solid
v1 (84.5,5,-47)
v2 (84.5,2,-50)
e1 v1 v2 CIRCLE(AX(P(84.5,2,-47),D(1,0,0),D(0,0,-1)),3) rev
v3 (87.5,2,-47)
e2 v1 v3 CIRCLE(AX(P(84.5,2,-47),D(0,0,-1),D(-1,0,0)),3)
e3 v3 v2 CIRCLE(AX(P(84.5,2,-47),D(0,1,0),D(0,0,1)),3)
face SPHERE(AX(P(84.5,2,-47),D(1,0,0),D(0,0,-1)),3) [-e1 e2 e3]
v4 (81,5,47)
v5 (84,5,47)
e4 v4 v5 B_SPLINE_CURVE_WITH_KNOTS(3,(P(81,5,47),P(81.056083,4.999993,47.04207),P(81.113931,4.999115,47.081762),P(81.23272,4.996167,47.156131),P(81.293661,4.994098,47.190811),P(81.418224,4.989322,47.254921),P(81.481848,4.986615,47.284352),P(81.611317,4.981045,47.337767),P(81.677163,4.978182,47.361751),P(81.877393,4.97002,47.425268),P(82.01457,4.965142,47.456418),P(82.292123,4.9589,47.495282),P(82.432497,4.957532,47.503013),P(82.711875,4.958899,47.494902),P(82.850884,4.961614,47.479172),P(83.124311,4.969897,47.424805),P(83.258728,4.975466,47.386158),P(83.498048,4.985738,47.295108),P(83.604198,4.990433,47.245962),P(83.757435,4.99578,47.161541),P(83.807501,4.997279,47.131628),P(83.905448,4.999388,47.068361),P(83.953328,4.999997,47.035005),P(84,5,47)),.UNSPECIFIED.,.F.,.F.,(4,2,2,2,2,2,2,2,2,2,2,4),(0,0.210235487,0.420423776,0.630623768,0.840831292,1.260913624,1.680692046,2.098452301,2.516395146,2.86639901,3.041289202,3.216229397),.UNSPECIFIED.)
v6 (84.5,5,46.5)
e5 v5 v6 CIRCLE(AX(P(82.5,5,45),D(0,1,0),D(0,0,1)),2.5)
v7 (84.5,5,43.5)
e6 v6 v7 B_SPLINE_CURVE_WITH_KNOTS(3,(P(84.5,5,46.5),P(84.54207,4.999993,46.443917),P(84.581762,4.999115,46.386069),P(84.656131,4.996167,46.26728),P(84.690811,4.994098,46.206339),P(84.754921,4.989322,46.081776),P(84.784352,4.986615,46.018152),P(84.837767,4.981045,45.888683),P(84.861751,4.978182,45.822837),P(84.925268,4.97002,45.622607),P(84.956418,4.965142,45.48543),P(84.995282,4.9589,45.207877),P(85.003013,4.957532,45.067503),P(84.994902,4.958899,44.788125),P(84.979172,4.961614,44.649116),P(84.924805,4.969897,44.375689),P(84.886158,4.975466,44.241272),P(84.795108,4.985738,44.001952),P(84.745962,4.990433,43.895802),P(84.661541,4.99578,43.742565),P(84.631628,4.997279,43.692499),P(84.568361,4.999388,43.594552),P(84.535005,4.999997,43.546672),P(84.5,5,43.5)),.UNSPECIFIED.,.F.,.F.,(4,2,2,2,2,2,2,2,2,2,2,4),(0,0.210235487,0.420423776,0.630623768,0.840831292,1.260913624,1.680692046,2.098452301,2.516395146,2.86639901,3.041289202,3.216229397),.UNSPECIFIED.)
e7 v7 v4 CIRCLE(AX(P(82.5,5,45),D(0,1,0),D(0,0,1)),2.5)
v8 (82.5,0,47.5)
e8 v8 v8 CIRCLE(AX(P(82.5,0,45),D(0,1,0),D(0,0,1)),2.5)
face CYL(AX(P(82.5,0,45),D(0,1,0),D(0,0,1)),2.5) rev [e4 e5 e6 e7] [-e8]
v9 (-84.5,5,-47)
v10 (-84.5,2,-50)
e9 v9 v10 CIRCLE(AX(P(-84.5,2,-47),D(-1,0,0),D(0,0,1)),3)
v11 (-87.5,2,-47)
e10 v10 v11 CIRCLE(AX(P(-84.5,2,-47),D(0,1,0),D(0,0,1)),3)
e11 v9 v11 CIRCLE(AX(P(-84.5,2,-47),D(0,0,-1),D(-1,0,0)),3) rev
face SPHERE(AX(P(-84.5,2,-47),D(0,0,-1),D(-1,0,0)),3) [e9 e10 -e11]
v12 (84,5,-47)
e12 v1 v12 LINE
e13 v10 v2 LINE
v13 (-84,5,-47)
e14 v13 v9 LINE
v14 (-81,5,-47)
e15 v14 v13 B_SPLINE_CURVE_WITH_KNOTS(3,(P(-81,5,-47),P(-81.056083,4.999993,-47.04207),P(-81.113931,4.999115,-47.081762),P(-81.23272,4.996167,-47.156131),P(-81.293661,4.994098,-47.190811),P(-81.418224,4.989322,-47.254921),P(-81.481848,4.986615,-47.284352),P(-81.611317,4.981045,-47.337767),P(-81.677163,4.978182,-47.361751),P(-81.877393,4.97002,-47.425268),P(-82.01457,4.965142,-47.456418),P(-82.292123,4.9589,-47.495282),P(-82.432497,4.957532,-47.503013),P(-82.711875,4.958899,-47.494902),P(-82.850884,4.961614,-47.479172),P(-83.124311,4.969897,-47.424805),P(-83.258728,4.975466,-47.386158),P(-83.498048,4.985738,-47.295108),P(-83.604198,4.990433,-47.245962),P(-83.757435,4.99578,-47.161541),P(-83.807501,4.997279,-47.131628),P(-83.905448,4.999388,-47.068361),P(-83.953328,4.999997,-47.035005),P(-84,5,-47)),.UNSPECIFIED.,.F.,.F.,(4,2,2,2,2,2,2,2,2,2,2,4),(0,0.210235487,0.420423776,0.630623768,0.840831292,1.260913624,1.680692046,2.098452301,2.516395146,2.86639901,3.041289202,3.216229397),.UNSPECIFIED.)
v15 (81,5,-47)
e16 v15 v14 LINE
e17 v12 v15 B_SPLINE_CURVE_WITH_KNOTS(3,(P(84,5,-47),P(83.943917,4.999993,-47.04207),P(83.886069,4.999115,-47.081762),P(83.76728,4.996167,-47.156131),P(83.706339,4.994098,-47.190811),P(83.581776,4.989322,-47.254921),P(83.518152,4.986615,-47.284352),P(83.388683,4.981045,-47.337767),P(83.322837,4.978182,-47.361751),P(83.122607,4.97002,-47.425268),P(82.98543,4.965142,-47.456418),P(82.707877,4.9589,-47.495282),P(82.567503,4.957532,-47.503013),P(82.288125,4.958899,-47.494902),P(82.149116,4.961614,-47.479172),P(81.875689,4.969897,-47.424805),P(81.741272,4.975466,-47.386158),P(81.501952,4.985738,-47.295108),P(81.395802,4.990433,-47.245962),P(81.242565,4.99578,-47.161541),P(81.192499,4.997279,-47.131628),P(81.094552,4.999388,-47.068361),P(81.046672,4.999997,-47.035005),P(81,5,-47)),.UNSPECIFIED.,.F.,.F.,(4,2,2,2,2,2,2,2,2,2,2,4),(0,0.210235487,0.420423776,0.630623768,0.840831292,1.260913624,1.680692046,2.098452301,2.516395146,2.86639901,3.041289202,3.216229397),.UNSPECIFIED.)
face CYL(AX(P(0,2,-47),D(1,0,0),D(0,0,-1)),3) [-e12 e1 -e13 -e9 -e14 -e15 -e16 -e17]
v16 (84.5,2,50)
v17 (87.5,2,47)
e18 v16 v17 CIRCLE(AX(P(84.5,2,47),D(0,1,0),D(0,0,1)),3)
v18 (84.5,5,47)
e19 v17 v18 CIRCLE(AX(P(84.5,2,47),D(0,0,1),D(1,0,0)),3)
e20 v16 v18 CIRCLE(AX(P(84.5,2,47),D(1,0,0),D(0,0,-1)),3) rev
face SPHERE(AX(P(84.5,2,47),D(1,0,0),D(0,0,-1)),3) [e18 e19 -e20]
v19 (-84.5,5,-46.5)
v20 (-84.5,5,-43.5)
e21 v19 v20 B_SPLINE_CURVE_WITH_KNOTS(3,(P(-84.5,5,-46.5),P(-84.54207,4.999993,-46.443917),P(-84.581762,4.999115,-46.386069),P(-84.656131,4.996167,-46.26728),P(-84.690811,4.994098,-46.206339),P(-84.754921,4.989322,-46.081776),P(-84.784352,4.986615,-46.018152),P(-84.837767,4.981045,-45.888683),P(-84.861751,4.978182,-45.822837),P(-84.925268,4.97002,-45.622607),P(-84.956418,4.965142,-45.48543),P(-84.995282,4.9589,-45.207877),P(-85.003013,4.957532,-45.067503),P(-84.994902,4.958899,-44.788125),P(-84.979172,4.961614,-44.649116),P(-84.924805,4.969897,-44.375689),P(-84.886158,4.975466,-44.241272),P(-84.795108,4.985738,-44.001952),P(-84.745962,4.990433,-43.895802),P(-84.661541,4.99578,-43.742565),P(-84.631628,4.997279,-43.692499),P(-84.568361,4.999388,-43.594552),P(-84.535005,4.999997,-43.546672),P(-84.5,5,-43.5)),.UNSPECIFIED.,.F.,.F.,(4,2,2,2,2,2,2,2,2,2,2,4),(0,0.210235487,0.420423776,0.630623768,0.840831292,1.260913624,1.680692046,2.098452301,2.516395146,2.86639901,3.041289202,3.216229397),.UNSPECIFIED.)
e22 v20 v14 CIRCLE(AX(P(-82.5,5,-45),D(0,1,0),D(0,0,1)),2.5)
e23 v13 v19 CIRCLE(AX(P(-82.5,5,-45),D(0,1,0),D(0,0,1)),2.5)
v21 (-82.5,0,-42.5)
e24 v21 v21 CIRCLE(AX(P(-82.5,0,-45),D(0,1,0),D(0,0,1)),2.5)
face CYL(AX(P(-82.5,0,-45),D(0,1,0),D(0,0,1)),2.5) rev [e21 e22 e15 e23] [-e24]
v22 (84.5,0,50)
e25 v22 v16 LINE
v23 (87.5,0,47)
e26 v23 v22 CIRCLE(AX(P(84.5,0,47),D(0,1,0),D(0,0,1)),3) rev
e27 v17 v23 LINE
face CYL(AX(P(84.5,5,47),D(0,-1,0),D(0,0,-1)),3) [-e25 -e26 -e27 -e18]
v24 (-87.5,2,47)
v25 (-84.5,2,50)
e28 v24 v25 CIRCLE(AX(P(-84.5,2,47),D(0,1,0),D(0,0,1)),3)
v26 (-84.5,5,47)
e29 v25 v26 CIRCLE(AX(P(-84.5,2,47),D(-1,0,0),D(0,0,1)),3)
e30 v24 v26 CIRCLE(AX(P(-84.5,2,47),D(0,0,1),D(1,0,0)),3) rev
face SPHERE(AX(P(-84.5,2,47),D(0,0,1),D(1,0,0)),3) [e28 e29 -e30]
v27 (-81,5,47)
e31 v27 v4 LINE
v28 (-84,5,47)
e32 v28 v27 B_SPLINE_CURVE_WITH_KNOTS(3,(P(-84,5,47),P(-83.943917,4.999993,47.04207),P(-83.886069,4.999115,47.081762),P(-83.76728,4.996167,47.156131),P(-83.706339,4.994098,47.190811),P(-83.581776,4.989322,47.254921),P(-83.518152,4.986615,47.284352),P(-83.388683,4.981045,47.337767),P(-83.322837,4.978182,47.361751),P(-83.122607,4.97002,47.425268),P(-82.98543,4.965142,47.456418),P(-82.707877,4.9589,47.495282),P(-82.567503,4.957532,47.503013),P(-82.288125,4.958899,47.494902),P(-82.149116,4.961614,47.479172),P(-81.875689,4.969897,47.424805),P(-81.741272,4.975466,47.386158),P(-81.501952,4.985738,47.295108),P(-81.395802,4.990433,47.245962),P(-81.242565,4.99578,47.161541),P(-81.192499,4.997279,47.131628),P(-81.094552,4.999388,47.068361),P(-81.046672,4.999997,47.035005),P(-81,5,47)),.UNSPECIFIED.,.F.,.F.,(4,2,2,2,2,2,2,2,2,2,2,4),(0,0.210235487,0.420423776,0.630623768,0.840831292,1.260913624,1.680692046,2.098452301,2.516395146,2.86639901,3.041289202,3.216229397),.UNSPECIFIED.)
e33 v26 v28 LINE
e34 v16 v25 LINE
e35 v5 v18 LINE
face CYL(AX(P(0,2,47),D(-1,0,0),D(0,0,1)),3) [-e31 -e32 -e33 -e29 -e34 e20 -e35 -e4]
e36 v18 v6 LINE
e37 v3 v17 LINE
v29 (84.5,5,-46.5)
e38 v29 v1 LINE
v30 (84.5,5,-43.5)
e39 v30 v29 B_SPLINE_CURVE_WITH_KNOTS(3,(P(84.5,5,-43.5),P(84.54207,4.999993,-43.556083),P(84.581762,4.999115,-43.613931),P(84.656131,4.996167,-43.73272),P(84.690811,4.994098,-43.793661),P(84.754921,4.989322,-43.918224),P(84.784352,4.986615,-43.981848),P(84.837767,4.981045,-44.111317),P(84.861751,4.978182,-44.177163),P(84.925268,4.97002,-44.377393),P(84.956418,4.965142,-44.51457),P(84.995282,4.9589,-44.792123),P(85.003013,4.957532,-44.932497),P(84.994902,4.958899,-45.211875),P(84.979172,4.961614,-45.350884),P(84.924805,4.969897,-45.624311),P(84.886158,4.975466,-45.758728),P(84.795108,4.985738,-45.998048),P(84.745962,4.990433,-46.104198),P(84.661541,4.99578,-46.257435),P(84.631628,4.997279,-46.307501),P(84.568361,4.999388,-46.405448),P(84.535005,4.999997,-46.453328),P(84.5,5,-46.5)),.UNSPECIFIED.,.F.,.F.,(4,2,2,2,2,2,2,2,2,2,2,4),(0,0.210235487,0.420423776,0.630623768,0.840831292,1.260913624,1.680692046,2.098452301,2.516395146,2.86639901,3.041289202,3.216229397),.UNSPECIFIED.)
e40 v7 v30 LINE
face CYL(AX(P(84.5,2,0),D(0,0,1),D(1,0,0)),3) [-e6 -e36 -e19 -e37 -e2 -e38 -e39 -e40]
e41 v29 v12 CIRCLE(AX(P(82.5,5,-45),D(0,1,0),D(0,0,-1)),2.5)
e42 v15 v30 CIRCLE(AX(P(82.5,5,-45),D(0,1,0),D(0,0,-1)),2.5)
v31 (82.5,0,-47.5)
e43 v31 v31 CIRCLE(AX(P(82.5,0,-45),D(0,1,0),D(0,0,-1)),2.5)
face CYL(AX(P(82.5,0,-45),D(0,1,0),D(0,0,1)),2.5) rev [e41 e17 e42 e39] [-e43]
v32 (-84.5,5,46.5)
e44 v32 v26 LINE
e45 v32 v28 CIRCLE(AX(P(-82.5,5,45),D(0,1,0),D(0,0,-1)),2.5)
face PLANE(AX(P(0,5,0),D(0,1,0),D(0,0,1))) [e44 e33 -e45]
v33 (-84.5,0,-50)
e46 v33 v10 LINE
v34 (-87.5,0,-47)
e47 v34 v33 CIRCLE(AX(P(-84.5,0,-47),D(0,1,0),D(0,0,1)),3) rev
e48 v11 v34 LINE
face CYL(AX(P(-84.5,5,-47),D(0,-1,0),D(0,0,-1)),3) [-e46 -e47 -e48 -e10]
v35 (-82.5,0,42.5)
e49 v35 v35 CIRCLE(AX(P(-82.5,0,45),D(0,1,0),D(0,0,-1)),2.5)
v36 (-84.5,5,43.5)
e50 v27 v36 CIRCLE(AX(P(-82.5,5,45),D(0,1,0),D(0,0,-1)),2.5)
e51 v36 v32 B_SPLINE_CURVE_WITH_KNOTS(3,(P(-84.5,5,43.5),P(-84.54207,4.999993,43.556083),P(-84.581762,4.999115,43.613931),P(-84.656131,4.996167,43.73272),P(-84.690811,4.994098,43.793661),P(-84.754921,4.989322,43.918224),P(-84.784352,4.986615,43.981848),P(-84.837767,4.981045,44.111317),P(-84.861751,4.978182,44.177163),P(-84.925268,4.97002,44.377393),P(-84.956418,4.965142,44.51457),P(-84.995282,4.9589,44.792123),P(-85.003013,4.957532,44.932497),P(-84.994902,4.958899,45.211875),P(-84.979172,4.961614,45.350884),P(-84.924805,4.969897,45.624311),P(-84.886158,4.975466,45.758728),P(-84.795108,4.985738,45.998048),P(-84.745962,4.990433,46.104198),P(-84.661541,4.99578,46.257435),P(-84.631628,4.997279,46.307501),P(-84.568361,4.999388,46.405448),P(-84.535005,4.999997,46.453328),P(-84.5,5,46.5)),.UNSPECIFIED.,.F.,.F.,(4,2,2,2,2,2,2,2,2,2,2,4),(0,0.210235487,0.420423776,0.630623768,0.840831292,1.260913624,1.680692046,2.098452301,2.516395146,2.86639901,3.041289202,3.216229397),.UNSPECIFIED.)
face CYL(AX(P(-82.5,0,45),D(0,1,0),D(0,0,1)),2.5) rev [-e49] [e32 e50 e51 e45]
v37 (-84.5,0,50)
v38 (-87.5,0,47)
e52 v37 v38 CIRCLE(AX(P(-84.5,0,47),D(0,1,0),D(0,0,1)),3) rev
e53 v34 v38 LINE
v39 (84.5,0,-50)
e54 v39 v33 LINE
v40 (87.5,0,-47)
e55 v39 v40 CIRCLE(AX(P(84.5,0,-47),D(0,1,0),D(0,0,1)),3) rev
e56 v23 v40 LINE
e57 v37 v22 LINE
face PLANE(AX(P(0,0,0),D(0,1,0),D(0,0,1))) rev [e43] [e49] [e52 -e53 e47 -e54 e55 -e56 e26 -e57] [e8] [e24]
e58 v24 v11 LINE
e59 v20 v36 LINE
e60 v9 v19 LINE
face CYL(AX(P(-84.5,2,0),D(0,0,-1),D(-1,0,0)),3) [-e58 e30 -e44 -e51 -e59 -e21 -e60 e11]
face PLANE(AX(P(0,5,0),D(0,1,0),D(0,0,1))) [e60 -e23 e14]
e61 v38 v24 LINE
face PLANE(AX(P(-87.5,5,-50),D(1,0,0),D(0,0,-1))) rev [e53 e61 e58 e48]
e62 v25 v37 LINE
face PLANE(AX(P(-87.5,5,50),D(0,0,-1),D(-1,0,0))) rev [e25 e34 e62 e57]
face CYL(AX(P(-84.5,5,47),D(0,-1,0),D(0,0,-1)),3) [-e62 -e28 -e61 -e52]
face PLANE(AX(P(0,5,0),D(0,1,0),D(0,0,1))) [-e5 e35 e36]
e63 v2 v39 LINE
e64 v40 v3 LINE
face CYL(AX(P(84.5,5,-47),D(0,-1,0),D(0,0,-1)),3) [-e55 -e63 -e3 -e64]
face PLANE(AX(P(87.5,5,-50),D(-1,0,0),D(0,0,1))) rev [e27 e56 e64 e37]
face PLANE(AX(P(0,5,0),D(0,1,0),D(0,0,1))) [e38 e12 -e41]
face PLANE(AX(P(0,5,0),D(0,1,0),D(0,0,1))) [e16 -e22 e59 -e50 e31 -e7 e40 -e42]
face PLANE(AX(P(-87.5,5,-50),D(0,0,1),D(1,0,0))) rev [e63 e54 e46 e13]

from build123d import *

# Parameters (mm, degrees)
SKETCH1_W           = 175
SKETCH1_H           = 100
BOSS_EXTRUDE1_DEPTH = 5
SKETCH2_R           = 2.5
CUT_EXTRUDE1_DEPTH  = 101.902180353
FILLET1_R           = 3


with BuildPart() as part:
    # Sketch1 → Boss-Extrude1 (new body)
    with BuildSketch(Plane(origin=(0, 0, 0), x_dir=(1, 0, 0), z_dir=(0, 1, 0))):
        Rectangle(SKETCH1_W, SKETCH1_H)
    extrude(amount=BOSS_EXTRUDE1_DEPTH)

    # Sketch2 → Cut-Extrude1 (cut, through all)
    with BuildSketch(Plane(origin=(0, 5, 0), x_dir=(1, 0, 0), z_dir=(0, 1, 0))):
        with Locations(Location((-82.5, 45, 0), (0, 0, 270))):
            Circle(SKETCH2_R)
        with Locations(Location((82.5, 45, 0), (0, 0, 90))):
            Circle(SKETCH2_R)
        with Locations(Location((82.5, -45, 0), (0, 0, 270))):
            Circle(SKETCH2_R)
        with Locations(Location((-82.5, -45, 0), (0, 0, 90))):
            Circle(SKETCH2_R)
    extrude(amount=-CUT_EXTRUDE1_DEPTH, mode=Mode.SUBTRACT)

    # Fillet1
    # the kernel refuses this fillet: 3 mm, written as the material it takes off along each edge
    with BuildSketch(Plane(origin=(-84.5, 2, 47), x_dir=(0, 1, 0), z_dir=(-1, 0, 0))) as fillet1_piece_1_section:
        Polygon((0, 0), (FILLET1_R, 0), (FILLET1_R, -FILLET1_R), (0, -FILLET1_R), align=None)
    fillet1_piece_1 = extrude(amount=FILLET1_R, mode=Mode.PRIVATE)
    fillet1_piece_1 = fillet1_piece_1 - Plane(origin=(-84.5, 2, 47), x_dir=(0, -0.7071067811865475, -0.7071067811865475), z_dir=(-1, 0, 0)) * Sphere(FILLET1_R, mode=Mode.PRIVATE)
    add(fillet1_piece_1, mode=Mode.SUBTRACT)
    with BuildSketch(Plane(origin=(-84.5, 2, -47), x_dir=(-1, 0, 0), z_dir=(0, 0, -1))) as fillet1_piece_2_section:
        Polygon((0, 0), (FILLET1_R, 0), (FILLET1_R, FILLET1_R), (0, FILLET1_R), align=None)
    fillet1_piece_2 = extrude(amount=FILLET1_R, mode=Mode.PRIVATE)
    fillet1_piece_2 = fillet1_piece_2 - Plane(origin=(-84.5, 2, -47), x_dir=(0.7071067811865475, -0.7071067811865475, 0), z_dir=(0, 0, -1)) * Sphere(FILLET1_R, mode=Mode.PRIVATE)
    add(fillet1_piece_2, mode=Mode.SUBTRACT)
    with BuildSketch(Plane(origin=(84.5, 2, 47), x_dir=(0, 1, 0), z_dir=(1, 0, 0))) as fillet1_piece_3_section:
        Polygon((0, 0), (FILLET1_R, 0), (FILLET1_R, FILLET1_R), (0, FILLET1_R), align=None)
    fillet1_piece_3 = extrude(amount=FILLET1_R, mode=Mode.PRIVATE)
    fillet1_piece_3 = fillet1_piece_3 - Plane(origin=(84.5, 2, 47), x_dir=(0, -0.7071067811865475, -0.7071067811865475), z_dir=(1, 0, 0)) * Sphere(FILLET1_R, mode=Mode.PRIVATE)
    add(fillet1_piece_3, mode=Mode.SUBTRACT)
    with BuildSketch(Plane(origin=(84.5, 2, -47), x_dir=(1, 0, 0), z_dir=(0, 0, -1))) as fillet1_piece_4_section:
        Polygon((0, 0), (FILLET1_R, 0), (FILLET1_R, -FILLET1_R), (0, -FILLET1_R), align=None)
    fillet1_piece_4 = extrude(amount=FILLET1_R, mode=Mode.PRIVATE)
    fillet1_piece_4 = fillet1_piece_4 - Plane(origin=(84.5, 2, -47), x_dir=(-0.7071067811865475, -0.7071067811865475, 0), z_dir=(0, 0, -1)) * Sphere(FILLET1_R, mode=Mode.PRIVATE)
    add(fillet1_piece_4, mode=Mode.SUBTRACT)
    with BuildSketch(Plane(origin=(-87.5, 5, 47), x_dir=(0, -1, 0), z_dir=(0, 0, -1)), Plane(origin=(87.5, 5, -47), x_dir=(0, -1, 0), z_dir=(0, 0, 1))) as fillet1_piece_5:
        with BuildLine():
            CenterArc((FILLET1_R, -FILLET1_R), FILLET1_R, 90, 90)
            Line((0, -FILLET1_R), (0, 0))
            Line((0, 0), (FILLET1_R, 0))
        make_face()
    extrude(amount=94, mode=Mode.SUBTRACT)
    with BuildSketch(Plane(origin=(84.5, 5, 50), x_dir=(0, 0, -1), z_dir=(-1, 0, 0))) as fillet1_piece_6:
        with BuildLine():
            CenterArc((FILLET1_R, FILLET1_R), FILLET1_R, 180, 90)
            Line((0, FILLET1_R), (0, 0))
            Line((0, 0), (FILLET1_R, 0))
        make_face()
    extrude(amount=169, mode=Mode.SUBTRACT)
    with BuildSketch(Plane(origin=(87.5, -7.5, 50), x_dir=(0, 0, -1), z_dir=(0, 1, 0)), Plane(origin=(87.5, -7.5, -50), x_dir=(-1, 0, 0), z_dir=(0, 1, 0))) as fillet1_piece_7:
        with BuildLine():
            CenterArc((FILLET1_R, FILLET1_R), FILLET1_R, 180, 90)
            Line((0, FILLET1_R), (0, 0))
            Line((0, 0), (FILLET1_R, 0))
        make_face()
    extrude(amount=9.5, mode=Mode.SUBTRACT)
    with BuildSketch(Plane(origin=(-87.5, -7.5, 50), x_dir=(0, 0, -1), z_dir=(0, 1, 0)), Plane(origin=(-87.5, -7.5, -50), x_dir=(1, 0, 0), z_dir=(0, 1, 0))) as fillet1_piece_8:
        with BuildLine():
            CenterArc((FILLET1_R, -FILLET1_R), FILLET1_R, 90, 90)
            Line((0, -FILLET1_R), (0, 0))
            Line((0, 0), (FILLET1_R, 0))
        make_face()
    extrude(amount=9.5, mode=Mode.SUBTRACT)
    with BuildSketch(Plane(origin=(-84.5, 5, -50), x_dir=(0, -1, 0), z_dir=(1, 0, 0))) as fillet1_piece_9:
        with BuildLine():
            CenterArc((FILLET1_R, -FILLET1_R), FILLET1_R, 90, 90)
            Line((0, -FILLET1_R), (0, 0))
            Line((0, 0), (FILLET1_R, 0))
        make_face()
    extrude(amount=169, mode=Mode.SUBTRACT)


solid = part.part
